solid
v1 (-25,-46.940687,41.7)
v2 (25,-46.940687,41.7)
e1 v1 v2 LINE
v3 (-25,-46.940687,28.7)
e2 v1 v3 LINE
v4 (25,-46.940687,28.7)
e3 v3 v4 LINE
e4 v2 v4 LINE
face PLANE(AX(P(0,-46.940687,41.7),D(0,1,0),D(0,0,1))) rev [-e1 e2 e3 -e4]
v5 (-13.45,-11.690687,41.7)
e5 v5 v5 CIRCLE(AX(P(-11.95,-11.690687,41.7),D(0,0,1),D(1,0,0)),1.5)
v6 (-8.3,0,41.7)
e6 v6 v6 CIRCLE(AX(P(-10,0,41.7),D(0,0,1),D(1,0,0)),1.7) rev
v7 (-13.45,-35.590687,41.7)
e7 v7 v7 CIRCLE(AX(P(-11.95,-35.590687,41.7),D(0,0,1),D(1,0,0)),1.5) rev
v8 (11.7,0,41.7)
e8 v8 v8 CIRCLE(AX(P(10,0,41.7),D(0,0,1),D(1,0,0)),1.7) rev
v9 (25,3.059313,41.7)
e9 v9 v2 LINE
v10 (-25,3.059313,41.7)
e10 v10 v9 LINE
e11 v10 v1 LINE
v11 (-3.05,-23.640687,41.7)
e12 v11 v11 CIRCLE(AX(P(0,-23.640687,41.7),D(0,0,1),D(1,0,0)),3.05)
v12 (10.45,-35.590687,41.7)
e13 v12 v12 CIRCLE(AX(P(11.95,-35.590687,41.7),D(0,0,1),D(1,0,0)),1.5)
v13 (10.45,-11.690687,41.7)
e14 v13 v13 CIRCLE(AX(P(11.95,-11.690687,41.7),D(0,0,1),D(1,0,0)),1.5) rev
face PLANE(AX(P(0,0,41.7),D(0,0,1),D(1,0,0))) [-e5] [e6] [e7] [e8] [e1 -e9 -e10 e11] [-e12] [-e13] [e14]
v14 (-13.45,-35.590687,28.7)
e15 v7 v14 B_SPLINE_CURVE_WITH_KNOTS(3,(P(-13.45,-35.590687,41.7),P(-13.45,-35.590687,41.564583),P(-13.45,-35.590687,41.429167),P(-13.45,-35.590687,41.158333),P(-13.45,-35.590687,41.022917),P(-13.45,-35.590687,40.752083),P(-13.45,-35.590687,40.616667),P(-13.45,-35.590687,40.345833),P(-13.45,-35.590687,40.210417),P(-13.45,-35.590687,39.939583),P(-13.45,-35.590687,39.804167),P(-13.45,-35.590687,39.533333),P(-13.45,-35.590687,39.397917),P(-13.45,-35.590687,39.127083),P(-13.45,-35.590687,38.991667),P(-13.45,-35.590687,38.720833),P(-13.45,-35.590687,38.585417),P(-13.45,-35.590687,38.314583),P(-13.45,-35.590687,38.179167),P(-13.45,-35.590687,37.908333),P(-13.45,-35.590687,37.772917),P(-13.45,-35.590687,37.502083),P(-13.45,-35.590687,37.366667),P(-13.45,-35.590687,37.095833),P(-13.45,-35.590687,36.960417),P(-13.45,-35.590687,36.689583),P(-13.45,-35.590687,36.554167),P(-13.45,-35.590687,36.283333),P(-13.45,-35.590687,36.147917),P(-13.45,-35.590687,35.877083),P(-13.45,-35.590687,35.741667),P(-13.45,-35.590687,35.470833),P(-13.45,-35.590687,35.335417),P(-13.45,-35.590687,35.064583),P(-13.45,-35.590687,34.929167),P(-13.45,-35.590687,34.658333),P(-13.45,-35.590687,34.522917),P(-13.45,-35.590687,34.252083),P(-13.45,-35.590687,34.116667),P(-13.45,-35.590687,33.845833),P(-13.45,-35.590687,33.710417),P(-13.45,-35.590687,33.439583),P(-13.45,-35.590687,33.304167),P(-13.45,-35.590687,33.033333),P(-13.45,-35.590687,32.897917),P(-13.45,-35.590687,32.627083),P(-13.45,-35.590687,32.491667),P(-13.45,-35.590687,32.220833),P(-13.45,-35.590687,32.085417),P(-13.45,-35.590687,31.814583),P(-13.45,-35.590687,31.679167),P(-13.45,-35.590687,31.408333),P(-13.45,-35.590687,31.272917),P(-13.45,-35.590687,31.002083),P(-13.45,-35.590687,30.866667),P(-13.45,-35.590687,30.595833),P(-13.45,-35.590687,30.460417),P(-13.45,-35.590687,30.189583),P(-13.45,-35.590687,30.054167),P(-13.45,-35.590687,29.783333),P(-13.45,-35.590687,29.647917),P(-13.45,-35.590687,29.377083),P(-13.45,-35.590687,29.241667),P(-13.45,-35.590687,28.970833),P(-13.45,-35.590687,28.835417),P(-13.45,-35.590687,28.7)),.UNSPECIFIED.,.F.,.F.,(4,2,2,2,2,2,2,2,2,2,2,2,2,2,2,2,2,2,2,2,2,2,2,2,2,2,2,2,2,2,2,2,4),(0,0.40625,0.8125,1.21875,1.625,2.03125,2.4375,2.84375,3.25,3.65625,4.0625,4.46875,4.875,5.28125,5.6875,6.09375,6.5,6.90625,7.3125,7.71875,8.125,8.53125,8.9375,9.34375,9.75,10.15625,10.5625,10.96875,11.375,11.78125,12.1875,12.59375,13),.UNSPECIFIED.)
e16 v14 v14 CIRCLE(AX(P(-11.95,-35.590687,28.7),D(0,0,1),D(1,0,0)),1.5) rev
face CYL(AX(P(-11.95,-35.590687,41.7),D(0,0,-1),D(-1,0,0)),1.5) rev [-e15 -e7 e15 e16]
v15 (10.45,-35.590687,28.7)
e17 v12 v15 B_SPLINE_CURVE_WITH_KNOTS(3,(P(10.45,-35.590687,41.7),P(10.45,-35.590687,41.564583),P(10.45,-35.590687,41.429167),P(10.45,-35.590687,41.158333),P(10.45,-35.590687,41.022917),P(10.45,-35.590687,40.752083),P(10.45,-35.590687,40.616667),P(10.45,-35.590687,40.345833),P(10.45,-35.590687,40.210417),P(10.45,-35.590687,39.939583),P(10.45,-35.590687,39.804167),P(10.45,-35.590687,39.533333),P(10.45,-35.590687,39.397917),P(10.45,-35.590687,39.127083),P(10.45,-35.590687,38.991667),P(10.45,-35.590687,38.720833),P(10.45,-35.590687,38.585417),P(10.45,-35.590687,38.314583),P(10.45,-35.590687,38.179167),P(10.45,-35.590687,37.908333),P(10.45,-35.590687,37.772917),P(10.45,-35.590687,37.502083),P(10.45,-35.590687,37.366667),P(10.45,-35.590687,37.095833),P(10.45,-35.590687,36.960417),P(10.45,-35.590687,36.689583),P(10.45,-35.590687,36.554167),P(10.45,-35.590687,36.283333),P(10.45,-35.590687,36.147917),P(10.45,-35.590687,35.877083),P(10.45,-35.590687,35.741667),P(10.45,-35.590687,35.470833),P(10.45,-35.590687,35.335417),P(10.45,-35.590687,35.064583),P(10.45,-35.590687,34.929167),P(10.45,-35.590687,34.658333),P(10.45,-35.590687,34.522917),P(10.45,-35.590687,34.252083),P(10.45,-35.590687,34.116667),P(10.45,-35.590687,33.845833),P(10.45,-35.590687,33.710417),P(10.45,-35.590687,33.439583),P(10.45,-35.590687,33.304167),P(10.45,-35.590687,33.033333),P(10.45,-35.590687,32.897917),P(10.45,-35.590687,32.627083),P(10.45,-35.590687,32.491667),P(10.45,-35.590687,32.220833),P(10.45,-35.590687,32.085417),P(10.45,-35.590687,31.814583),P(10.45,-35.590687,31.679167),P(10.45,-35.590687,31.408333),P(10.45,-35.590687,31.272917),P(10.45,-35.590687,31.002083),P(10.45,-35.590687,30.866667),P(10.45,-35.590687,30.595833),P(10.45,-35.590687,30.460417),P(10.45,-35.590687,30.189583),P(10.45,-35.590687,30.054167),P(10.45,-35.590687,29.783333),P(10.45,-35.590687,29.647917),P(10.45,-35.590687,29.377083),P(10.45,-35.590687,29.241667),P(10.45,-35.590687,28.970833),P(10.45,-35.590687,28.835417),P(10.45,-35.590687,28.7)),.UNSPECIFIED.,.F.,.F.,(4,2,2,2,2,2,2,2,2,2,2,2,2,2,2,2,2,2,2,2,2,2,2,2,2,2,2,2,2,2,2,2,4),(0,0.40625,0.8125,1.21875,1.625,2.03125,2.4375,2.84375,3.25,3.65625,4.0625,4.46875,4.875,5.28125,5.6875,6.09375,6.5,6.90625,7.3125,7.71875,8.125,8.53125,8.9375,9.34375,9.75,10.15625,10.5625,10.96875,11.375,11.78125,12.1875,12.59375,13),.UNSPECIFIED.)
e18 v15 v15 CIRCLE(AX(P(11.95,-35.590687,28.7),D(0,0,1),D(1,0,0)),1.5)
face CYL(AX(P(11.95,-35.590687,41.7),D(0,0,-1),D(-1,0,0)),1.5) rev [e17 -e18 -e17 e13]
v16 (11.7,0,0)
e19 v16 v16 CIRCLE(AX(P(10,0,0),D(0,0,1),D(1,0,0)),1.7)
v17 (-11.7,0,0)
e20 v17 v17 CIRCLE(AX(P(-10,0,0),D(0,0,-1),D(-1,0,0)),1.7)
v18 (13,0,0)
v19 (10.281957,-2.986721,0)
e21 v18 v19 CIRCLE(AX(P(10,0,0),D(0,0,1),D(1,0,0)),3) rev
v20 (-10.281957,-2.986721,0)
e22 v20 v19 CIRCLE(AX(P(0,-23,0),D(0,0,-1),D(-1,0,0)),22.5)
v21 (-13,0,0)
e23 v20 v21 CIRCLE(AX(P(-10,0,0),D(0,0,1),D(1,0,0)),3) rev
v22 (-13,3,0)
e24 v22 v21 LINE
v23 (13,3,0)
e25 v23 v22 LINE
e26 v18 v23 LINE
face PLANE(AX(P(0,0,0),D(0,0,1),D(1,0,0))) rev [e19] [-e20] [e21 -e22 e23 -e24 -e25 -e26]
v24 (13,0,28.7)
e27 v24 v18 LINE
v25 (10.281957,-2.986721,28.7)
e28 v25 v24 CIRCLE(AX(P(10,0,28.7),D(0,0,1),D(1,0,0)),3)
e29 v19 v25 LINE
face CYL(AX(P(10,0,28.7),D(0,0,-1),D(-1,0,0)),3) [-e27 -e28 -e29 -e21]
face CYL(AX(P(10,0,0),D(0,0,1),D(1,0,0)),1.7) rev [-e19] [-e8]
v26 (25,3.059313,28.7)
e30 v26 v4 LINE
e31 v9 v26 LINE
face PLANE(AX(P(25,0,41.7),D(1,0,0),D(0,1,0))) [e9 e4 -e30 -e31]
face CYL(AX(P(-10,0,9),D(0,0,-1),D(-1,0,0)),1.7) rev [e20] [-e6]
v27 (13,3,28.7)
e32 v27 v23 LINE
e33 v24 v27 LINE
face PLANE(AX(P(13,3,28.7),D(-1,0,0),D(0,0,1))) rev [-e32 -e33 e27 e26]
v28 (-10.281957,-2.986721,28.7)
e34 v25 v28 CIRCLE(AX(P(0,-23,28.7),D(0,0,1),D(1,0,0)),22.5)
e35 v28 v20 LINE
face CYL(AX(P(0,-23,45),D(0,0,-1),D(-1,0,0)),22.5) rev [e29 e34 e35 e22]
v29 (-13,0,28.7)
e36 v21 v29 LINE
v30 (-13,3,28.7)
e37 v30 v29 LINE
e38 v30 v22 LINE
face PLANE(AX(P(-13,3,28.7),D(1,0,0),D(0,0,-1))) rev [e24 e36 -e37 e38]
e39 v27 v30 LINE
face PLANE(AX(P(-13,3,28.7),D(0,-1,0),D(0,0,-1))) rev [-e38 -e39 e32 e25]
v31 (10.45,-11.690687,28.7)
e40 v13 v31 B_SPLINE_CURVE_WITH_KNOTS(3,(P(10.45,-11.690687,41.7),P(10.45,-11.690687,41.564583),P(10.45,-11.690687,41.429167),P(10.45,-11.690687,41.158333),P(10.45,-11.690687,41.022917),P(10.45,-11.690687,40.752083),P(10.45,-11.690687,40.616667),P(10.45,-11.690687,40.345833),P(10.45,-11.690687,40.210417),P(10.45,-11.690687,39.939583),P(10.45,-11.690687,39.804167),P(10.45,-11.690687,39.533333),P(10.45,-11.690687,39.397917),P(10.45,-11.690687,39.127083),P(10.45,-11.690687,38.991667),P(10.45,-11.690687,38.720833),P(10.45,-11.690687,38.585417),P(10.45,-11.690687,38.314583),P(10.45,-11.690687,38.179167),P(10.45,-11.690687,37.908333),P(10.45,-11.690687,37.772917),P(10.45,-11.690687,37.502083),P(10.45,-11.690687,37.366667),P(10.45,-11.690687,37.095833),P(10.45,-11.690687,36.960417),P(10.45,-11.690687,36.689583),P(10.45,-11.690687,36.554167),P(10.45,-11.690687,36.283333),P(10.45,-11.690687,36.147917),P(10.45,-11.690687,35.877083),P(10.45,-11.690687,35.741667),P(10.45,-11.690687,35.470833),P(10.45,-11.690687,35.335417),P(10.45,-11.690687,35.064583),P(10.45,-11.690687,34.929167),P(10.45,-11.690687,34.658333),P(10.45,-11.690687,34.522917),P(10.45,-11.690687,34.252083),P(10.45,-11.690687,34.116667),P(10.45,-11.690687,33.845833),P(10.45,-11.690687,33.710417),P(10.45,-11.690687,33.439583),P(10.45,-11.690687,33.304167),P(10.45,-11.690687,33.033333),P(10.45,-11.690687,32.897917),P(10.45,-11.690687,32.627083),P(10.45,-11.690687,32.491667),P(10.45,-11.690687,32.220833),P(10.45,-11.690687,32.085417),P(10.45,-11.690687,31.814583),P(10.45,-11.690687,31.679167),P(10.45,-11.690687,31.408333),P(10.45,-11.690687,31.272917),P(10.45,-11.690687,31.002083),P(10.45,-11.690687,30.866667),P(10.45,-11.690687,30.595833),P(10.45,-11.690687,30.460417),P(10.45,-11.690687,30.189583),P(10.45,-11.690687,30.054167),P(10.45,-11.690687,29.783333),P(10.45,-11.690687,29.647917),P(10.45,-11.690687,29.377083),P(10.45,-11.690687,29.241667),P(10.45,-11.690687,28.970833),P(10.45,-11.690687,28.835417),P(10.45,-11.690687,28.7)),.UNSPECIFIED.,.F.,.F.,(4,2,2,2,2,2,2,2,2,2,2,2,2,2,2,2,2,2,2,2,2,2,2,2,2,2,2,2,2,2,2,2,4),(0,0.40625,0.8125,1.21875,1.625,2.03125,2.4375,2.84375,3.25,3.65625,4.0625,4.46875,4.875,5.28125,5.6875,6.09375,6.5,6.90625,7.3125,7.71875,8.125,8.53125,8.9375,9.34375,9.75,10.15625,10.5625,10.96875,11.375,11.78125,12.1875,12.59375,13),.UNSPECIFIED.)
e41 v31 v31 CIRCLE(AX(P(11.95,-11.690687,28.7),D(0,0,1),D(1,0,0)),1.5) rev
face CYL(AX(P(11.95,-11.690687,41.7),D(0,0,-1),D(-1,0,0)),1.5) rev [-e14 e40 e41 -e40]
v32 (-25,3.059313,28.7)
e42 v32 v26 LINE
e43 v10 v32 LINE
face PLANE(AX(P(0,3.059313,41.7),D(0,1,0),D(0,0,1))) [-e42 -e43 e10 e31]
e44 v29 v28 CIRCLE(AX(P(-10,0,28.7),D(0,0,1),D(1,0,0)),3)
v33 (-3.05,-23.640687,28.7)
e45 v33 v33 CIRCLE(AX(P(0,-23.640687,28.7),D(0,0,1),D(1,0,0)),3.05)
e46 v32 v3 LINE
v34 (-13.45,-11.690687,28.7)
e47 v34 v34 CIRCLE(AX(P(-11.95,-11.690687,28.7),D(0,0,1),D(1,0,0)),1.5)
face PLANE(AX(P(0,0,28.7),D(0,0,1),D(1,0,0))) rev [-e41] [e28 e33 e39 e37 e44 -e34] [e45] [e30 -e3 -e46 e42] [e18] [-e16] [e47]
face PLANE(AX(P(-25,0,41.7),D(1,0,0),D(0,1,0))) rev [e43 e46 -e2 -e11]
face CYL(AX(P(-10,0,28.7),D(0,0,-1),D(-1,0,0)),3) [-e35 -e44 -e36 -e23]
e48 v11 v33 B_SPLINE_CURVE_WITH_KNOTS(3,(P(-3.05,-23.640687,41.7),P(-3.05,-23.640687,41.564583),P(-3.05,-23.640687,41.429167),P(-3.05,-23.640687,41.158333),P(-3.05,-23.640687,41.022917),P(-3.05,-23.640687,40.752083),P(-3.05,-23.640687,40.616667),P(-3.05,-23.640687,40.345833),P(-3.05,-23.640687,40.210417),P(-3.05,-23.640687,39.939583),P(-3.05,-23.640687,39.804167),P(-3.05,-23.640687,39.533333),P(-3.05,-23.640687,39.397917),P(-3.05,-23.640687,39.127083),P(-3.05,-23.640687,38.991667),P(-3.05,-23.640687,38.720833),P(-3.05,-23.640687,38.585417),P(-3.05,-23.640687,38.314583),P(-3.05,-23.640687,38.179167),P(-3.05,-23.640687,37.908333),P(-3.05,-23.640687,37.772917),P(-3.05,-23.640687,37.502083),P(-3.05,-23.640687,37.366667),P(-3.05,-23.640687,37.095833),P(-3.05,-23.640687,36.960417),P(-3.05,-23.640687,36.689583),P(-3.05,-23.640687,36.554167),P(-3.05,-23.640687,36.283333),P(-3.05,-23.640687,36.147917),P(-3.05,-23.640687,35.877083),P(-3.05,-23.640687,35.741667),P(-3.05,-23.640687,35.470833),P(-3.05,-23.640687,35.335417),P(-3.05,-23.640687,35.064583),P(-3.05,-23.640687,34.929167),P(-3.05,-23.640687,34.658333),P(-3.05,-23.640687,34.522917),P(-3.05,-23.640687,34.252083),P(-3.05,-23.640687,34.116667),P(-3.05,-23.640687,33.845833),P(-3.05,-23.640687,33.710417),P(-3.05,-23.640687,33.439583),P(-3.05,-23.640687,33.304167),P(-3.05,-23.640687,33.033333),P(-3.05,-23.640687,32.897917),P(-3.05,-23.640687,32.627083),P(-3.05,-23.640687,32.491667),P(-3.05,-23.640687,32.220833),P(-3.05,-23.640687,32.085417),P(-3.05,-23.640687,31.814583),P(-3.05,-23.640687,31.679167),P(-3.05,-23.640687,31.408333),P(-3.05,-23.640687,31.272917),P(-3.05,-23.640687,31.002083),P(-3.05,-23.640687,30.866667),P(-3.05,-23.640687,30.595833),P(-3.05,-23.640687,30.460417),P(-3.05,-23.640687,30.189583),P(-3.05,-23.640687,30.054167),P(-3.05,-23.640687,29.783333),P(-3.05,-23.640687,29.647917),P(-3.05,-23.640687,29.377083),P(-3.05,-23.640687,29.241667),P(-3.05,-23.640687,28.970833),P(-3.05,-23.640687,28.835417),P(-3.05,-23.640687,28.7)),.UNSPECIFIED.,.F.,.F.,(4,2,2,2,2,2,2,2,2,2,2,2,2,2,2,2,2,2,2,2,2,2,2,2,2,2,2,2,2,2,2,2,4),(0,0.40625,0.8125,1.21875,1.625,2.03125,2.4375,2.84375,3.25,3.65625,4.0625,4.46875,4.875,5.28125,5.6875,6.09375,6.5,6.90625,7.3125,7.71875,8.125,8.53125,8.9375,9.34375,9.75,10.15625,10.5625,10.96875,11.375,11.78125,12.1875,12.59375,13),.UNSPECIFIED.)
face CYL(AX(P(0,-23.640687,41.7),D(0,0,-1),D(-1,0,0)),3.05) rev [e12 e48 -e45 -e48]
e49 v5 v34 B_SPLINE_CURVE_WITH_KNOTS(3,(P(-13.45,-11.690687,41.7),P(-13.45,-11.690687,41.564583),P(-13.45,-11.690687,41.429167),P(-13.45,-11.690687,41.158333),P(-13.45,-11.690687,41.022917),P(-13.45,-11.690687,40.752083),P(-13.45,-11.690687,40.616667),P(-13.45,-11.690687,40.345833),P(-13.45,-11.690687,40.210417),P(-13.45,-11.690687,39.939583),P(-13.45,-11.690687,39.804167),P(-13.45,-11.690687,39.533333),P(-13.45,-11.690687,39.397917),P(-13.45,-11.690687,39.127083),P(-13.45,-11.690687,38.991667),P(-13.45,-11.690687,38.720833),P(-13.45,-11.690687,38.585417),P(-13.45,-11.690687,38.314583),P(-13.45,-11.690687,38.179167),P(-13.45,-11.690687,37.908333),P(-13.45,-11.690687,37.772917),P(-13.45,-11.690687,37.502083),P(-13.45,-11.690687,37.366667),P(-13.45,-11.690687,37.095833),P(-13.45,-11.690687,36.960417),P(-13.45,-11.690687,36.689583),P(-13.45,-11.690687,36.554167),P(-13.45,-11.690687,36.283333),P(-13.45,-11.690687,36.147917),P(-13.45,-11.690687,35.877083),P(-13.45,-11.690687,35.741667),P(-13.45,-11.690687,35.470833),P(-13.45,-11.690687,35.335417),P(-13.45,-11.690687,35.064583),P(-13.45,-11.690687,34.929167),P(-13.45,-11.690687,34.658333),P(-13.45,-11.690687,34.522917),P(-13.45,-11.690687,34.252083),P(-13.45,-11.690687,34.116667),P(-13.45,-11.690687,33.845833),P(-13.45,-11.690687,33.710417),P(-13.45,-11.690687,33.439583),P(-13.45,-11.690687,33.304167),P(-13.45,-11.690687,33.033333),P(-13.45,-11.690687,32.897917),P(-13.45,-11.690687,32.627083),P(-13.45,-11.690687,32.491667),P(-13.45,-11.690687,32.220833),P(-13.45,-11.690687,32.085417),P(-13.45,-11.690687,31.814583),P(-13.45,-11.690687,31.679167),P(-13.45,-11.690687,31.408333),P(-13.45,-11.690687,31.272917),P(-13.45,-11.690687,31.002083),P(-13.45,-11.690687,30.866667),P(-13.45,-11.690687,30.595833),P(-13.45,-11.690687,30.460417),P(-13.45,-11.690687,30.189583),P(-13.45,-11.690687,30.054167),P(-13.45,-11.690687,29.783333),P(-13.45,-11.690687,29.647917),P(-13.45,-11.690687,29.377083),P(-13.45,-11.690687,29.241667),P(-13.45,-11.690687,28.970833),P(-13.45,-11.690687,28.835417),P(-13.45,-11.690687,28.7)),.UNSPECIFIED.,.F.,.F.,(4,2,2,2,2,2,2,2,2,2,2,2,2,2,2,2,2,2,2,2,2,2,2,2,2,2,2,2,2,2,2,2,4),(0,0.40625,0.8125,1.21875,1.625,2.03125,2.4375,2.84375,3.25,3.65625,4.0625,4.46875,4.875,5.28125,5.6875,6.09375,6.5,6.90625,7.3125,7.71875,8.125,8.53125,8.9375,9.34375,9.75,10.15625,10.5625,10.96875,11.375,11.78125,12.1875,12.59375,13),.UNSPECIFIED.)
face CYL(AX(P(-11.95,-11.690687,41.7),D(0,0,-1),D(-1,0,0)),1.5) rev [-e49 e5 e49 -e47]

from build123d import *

# Parameters (mm, degrees)
SKETCH1_W           = 26
SKETCH1_H           = 6
BOSS_EXTRUDE1_DEPTH = 28.7
SKETCH4_R           = 1.7
CUT_EXTRUDE2_DEPTH  = 9
SKETCH8_R           = 1.7
CUT_EXTRUDE4_DEPTH  = 32.649486568
FILLET2_R           = 3
SKETCH9_R           = 22.5
CUT_EXTRUDE5_DEPTH  = 45
SKETCH_2_W          = 50
SKETCH_2_H          = 50
SKETCH_2_R          = 1.5
SKETCH_2_R_2        = 1.7
EXTRUDE_2_DEPTH     = 13


with BuildPart() as part:
    # Sketch1 → Boss-Extrude1 (new body)
    with BuildSketch(Plane.XY):
        Rectangle(SKETCH1_W, SKETCH1_H)
    extrude(amount=BOSS_EXTRUDE1_DEPTH)

    # Sketch4 → Cut-Extrude2 (cut)
    with BuildSketch(Plane(origin=(0, 0, 0), x_dir=(-1, 0, 0), z_dir=(0, 0, -1))):
        with Locations((-15, 0)):
            Circle(SKETCH4_R)
        with Locations((10, 0)):
            Circle(SKETCH4_R)
    extrude(amount=-CUT_EXTRUDE2_DEPTH, mode=Mode.SUBTRACT)

    # Sketch8 → Cut-Extrude4 (cut, through all)
    with BuildSketch(Plane.XY.offset(28.7)):
        with Locations((-10, 0)):
            Circle(SKETCH8_R)
        with Locations((10, 0)):
            Circle(SKETCH8_R)
    extrude(amount=-CUT_EXTRUDE4_DEPTH, mode=Mode.SUBTRACT)

    # Fillet2
    fillet2_edges = [part.edges().sort_by_distance(p)[0] for p in [
        (13, -3, 14.35),
        (-13, -3, 14.35),
    ]]
    fillet(fillet2_edges, radius=FILLET2_R)

    # Sketch9 → Cut-Extrude5 (cut)
    with BuildSketch(Plane(origin=(0, 0, 0), x_dir=(-1, 0, 0), z_dir=(0, 0, -1))):
        with Locations((0, -23)):
            Circle(SKETCH9_R)
    extrude(amount=-CUT_EXTRUDE5_DEPTH, mode=Mode.SUBTRACT)

    # 草图2 → 凸台-拉伸2 (add)
    with BuildSketch(Plane.XY.offset(28.7)):
        with Locations((0, -21.940687277)):
            Rectangle(SKETCH_2_W, SKETCH_2_H)
        with Locations((-11.95, -35.590687277)):
            Circle(SKETCH_2_R, mode=Mode.SUBTRACT)
        with BuildLine():
            ThreePointArc((3.05, -23.640687277), (0, -26.690687277), (-3.05, -23.640687277))
            ThreePointArc((-3.05, -23.640687277), (0, -20.590687277), (3.05, -23.640687277))
        make_face(mode=Mode.SUBTRACT)
        with Locations((11.95, -35.590687277)):
            Circle(SKETCH_2_R, mode=Mode.SUBTRACT)
        with Locations((-11.95, -11.690687277)):
            Circle(SKETCH_2_R, mode=Mode.SUBTRACT)
        with Locations((11.95, -11.690687277)):
            Circle(SKETCH_2_R, mode=Mode.SUBTRACT)
        with Locations((-10, 0)):
            Circle(SKETCH_2_R_2, mode=Mode.SUBTRACT)
        with Locations((10, 0)):
            Circle(SKETCH_2_R_2, mode=Mode.SUBTRACT)
    extrude(amount=EXTRUDE_2_DEPTH)


solid = part.part
